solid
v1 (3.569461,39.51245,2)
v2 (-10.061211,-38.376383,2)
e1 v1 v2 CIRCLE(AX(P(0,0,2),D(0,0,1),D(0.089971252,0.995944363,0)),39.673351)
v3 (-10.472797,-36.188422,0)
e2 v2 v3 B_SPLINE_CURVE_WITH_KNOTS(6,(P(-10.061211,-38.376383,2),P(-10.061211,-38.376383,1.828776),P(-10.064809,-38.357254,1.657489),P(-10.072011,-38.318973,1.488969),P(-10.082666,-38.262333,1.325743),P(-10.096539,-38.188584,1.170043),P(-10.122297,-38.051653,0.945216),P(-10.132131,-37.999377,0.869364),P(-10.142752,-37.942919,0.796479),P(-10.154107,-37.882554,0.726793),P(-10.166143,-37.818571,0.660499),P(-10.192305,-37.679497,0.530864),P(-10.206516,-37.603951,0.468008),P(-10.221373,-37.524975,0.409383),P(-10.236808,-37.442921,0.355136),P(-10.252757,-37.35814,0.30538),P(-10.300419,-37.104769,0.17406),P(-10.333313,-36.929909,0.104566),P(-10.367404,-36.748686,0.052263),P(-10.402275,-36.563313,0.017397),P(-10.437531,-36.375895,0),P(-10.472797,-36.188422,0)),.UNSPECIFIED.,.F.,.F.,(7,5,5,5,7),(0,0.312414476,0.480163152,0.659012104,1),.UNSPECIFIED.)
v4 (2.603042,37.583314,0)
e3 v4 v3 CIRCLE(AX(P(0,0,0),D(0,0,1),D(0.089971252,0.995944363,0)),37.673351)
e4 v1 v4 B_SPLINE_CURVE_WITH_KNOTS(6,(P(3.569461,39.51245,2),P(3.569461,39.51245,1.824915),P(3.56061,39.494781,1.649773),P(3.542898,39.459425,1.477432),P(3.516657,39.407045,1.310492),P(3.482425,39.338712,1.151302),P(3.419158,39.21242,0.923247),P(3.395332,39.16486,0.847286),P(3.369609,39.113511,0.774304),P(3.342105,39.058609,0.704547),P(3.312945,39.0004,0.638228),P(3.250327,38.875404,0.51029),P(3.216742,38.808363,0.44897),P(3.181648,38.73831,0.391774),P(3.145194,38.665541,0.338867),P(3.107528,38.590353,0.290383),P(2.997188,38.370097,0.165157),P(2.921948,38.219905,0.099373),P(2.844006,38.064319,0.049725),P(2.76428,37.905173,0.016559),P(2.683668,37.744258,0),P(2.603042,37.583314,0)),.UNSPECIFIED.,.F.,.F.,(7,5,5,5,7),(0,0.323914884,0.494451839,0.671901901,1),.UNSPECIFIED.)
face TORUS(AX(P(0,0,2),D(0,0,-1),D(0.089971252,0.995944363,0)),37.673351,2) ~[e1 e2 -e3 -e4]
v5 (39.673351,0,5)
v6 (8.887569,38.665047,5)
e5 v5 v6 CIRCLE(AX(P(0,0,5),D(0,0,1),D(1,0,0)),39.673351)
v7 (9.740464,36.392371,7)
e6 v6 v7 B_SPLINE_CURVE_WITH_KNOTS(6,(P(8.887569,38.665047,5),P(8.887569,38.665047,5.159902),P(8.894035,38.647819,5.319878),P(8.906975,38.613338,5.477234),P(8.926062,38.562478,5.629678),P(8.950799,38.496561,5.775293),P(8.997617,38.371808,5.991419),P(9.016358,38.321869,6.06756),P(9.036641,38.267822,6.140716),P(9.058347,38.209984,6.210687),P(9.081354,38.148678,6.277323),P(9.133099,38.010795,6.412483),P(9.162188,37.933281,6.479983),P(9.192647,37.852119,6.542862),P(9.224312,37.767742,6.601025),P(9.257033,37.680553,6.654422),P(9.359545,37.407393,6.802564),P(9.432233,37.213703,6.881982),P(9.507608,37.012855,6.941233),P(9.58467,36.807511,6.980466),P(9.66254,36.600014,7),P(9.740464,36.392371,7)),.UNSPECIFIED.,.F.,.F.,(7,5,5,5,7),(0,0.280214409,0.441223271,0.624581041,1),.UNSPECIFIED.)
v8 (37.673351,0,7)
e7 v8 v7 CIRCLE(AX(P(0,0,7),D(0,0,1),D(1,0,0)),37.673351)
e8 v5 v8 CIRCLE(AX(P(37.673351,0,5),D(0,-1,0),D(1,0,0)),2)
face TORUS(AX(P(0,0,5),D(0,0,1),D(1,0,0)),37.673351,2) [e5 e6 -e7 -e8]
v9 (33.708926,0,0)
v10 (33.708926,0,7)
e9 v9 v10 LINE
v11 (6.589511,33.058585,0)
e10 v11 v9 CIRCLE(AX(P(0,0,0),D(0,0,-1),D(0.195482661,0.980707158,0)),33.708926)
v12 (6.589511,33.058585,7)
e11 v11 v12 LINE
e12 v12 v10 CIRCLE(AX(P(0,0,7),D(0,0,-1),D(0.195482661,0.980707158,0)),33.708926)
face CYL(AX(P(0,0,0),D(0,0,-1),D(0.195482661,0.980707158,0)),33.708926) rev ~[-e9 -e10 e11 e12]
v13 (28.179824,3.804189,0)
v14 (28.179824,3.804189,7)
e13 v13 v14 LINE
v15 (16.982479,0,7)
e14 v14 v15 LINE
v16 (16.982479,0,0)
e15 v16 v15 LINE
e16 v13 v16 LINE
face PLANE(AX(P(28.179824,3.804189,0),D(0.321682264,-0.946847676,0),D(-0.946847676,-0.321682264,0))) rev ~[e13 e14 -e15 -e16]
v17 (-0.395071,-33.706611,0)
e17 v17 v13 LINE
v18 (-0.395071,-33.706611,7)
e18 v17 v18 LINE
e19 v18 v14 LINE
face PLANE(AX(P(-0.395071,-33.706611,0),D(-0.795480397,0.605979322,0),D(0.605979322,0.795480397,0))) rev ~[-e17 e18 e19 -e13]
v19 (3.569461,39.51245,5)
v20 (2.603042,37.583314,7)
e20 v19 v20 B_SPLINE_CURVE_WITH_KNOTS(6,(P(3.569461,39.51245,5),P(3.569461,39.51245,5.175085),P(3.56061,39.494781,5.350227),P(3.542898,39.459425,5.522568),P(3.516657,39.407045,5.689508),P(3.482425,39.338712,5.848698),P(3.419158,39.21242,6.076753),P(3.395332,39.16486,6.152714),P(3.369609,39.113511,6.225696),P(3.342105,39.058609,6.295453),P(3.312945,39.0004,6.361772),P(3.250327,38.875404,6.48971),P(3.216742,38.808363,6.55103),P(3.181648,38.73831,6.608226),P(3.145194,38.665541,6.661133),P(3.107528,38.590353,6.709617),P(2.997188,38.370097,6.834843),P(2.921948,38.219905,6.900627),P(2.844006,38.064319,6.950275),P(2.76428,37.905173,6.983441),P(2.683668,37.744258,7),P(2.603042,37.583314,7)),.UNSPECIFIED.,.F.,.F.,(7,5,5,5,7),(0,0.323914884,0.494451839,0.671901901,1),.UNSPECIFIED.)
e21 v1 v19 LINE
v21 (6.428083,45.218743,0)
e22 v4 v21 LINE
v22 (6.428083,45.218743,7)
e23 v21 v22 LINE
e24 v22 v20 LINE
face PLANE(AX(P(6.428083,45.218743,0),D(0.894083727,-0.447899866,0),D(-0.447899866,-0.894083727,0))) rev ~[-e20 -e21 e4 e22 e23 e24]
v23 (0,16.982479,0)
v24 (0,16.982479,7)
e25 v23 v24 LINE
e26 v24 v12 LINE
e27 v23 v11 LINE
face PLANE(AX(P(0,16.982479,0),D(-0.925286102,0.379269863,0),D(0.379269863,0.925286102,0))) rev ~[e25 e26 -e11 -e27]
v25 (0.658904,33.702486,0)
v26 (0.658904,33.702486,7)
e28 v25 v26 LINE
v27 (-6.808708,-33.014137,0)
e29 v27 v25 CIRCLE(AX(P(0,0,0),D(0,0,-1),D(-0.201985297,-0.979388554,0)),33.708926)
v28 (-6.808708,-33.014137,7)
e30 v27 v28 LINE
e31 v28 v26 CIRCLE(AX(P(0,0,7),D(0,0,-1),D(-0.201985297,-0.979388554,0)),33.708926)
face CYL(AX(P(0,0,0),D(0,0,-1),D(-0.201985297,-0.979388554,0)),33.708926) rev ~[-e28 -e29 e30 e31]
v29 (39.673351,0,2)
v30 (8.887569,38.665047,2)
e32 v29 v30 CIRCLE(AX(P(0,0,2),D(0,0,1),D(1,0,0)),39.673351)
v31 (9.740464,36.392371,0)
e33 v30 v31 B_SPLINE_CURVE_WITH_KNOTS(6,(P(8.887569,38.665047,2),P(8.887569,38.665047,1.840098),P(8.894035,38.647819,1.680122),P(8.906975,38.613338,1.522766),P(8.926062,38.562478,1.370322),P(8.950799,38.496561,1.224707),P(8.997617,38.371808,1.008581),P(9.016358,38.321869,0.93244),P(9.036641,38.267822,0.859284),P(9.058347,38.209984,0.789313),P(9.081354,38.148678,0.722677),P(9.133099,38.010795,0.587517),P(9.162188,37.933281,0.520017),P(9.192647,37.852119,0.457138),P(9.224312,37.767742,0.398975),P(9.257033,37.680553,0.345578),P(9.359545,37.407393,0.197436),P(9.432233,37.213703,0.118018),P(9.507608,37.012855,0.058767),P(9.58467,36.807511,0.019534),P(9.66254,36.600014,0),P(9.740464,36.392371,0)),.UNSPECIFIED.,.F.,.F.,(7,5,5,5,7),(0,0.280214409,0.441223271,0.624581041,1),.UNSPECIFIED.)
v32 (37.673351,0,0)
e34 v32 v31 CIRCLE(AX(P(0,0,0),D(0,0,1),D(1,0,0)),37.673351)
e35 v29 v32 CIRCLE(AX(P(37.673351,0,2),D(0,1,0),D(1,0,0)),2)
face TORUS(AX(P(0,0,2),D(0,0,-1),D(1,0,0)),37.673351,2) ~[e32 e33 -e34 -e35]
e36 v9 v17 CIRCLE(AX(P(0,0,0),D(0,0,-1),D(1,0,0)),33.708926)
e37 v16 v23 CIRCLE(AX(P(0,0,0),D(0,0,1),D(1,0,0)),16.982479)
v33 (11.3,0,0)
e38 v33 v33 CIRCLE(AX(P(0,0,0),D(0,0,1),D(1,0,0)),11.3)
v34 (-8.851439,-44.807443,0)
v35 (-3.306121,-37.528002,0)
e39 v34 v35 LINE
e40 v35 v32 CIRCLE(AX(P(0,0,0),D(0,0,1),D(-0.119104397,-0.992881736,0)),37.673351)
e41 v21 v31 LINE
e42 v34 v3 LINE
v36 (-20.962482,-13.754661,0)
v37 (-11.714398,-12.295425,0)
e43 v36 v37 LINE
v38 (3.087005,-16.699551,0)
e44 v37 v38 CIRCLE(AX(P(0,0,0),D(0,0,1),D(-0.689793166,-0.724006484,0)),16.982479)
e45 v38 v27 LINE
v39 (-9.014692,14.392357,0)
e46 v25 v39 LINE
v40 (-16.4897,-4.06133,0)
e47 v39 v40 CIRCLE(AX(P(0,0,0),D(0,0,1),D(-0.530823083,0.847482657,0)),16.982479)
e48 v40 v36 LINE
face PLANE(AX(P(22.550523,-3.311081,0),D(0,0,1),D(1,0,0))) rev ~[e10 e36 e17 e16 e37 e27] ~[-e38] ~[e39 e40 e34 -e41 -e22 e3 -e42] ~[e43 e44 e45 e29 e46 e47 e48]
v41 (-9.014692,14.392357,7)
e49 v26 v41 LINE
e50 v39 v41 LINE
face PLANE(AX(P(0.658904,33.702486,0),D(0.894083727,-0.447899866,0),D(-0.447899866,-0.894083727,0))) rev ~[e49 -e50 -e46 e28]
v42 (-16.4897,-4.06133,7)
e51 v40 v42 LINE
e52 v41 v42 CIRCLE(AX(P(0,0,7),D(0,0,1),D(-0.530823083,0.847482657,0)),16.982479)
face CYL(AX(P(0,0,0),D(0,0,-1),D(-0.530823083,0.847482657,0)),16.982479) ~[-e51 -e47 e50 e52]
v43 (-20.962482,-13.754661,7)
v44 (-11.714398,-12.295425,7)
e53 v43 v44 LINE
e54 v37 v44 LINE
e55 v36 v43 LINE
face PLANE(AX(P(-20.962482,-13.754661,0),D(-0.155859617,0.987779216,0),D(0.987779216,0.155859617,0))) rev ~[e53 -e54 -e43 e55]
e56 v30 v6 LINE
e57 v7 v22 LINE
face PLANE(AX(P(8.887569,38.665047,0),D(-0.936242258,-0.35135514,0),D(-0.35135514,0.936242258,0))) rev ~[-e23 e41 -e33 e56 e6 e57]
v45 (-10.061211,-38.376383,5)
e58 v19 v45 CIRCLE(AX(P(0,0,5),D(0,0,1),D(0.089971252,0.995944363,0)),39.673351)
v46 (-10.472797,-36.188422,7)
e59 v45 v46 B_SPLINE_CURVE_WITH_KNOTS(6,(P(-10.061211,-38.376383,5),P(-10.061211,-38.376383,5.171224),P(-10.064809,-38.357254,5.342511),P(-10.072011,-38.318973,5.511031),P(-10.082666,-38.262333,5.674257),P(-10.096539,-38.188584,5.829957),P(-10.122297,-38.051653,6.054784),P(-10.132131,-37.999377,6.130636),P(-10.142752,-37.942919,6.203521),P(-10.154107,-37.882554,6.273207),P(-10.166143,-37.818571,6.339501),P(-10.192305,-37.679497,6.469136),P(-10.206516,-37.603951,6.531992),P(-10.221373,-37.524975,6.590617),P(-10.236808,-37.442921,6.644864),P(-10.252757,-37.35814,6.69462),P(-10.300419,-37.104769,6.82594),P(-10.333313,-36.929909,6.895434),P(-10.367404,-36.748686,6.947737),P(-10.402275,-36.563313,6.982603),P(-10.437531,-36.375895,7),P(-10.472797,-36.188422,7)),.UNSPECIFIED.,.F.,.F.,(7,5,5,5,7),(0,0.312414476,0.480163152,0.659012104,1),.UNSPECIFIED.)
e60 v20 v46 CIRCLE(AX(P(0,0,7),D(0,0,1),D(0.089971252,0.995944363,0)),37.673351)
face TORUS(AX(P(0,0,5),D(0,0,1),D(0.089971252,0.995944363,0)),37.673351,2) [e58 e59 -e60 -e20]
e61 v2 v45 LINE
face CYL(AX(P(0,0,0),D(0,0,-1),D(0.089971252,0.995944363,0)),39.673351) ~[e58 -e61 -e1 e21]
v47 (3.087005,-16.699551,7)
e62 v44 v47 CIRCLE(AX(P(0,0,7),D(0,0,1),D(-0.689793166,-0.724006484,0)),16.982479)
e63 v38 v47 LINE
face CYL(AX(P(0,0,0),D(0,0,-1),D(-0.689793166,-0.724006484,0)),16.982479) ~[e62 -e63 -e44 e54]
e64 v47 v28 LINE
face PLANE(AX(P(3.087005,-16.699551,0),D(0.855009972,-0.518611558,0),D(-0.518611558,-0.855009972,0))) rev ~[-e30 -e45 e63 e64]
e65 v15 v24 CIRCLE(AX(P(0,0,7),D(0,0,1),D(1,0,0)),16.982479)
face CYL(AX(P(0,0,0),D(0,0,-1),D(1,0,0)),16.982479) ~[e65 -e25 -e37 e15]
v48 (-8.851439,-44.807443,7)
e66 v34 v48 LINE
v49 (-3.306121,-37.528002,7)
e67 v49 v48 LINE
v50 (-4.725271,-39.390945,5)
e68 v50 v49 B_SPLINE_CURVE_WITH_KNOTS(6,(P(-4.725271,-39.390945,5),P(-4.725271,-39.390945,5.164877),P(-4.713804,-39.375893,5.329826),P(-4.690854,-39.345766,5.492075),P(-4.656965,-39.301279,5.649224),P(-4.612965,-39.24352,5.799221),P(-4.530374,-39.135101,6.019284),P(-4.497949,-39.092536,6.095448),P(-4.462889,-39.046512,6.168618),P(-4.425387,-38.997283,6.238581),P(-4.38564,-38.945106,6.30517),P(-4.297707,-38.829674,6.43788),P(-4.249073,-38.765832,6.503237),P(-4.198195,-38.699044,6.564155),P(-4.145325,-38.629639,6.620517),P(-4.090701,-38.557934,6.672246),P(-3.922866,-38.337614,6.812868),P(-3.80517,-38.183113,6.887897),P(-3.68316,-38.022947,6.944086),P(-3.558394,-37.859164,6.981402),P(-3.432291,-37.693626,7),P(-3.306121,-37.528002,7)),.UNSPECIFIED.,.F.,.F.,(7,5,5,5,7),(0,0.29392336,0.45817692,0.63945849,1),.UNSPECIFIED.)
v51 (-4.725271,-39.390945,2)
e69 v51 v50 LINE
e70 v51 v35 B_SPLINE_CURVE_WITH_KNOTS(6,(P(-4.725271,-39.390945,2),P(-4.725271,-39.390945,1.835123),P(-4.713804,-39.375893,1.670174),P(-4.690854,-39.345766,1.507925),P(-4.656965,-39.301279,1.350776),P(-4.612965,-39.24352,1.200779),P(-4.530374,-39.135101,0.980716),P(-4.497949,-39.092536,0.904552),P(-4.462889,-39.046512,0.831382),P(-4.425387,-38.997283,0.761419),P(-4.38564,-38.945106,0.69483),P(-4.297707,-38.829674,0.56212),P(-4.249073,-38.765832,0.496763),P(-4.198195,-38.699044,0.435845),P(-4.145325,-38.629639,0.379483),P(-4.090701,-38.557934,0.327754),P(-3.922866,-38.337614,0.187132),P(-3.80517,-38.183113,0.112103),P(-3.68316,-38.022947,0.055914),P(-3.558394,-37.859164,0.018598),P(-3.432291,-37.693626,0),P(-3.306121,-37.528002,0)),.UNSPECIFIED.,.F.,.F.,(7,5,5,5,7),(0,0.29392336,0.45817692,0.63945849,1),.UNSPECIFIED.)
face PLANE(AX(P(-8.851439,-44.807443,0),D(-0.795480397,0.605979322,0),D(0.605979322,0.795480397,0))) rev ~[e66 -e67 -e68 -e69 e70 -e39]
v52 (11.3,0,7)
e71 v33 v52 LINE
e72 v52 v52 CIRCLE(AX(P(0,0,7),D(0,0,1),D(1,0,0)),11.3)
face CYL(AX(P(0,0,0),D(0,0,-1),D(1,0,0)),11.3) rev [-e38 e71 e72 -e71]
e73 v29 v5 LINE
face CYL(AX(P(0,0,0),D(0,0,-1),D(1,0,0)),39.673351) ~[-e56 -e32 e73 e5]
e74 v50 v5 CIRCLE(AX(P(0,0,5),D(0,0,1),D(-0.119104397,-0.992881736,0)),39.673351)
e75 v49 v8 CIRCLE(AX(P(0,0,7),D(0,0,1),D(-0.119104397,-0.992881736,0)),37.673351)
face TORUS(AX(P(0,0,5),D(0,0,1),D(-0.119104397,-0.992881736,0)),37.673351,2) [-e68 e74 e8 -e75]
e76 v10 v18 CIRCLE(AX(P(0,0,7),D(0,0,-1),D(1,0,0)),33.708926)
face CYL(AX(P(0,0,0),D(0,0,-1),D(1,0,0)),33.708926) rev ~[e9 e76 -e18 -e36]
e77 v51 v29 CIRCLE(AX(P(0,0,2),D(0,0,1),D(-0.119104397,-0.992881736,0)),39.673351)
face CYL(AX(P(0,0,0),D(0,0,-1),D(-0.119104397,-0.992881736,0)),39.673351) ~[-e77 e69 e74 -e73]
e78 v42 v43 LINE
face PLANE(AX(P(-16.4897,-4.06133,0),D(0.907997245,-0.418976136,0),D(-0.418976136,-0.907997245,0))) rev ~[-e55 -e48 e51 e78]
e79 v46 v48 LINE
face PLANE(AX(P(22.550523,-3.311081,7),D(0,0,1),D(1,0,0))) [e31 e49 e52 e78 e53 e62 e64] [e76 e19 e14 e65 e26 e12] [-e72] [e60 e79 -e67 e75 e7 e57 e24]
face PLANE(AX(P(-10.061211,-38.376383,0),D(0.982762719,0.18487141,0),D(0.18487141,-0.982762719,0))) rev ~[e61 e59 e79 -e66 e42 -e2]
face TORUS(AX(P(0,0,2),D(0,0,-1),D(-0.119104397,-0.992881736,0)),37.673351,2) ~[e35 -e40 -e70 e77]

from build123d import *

# Parameters (mm, degrees)
F0_R     = 11.3
F1_DEPTH = 7
F2_R     = 2


# Not quite as in the source:
# - a feature names something its author has since deleted; it is built from what else it names


with BuildPart() as f1:
    # F0 (on Top) → F1 (new body)
    with BuildSketch(Plane.XY):
        with BuildLine():
            Line((8.8875694593, 38.6650469228), (6.5895106012, 33.0585853257))
            ThreePointArc((6.5895106012, 33.0585853257), (26.0616292761, 21.3795040442), (33.7089263208, 0))
            ThreePointArc((33.7089263208, 0), (23.6957200597, -23.9750821594), (-0.3950708864, -33.7066111126))
            Line((-0.3950708864, -33.7066111126), (-4.7252705017, -39.390945192))
            ThreePointArc((-4.7252705017, -39.390945192), (26.3297116519, -29.6769443973), (39.6733505572, 0))
            ThreePointArc((39.6733505572, 0), (31.0368684244, 24.7120930485), (8.8875694593, 38.6650469228))
        make_face()
        with BuildLine():
            ThreePointArc((0.6589035842, 33.7024859583), (3.6384789483, 33.5119856864), (6.5895106012, 33.0585853257))
            Line((6.5895106012, 33.0585853257), (8.8875694593, 38.6650469228))
            ThreePointArc((8.8875694593, 38.6650469228), (6.2429099817, 39.1790865053), (3.5694610238, 39.5124498409))
            Line((3.5694610238, 39.5124498409), (0.6589035842, 33.7024859583))
        make_face()
        with BuildLine():
            Line((-10.061211071, -38.3763830528), (-6.8087075048, -33.0141366056))
            ThreePointArc((-6.8087075048, -33.0141366056), (-33.4997306504, 3.7496346558), (0.6589035842, 33.7024859583))
            Line((0.6589035842, 33.7024859583), (3.5694610238, 39.5124498409))
            ThreePointArc((3.5694610238, 39.5124498409), (-39.0794482696, 6.8389668354), (-10.061211071, -38.3763830528))
        make_face()
        with BuildLine():
            ThreePointArc((-0.3950708864, -33.7066111126), (-3.6184922292, -33.5141496638), (-6.8087075048, -33.0141366056))
            Line((-6.8087075048, -33.0141366056), (-10.061211071, -38.3763830528))
            ThreePointArc((-10.061211071, -38.3763830528), (-7.4106236855, -38.9750869277), (-4.7252705017, -39.390945192))
            Line((-4.7252705017, -39.390945192), (-0.3950708864, -33.7066111126))
        make_face()
        with BuildLine():
            ThreePointArc((3.5694610238, 39.5124498409), (6.2429099817, 39.1790865053), (8.8875694593, 38.6650469228))
            Line((8.8875694593, 38.6650469228), (6.4280834783, 45.2187427282))
            Line((6.4280834783, 45.2187427282), (3.5694610238, 39.5124498409))
        make_face()
        with BuildLine():
            ThreePointArc((-4.7252705017, -39.390945192), (-7.4106236855, -38.9750869277), (-10.061211071, -38.3763830528))
            Line((-10.061211071, -38.3763830528), (-8.8514386924, -44.8074434017))
            Line((-8.8514386924, -44.8074434017), (-4.7252705017, -39.390945192))
        make_face()
        with BuildLine():
            ThreePointArc((-9.0146919562, 14.392356585), (-4.6897069772, 16.3221091653), (0, 16.9824791811))
            Line((0, 16.9824791811), (6.5895106012, 33.0585853257))
            ThreePointArc((6.5895106012, 33.0585853257), (3.6384789483, 33.5119856864), (0.6589035842, 33.7024859583))
            Line((0.6589035842, 33.7024859583), (-9.0146919562, 14.392356585))
        make_face()
        with BuildLine():
            ThreePointArc((3.0870048037, -16.6995509065), (13.054301857, -10.8623110875), (16.9824791811, 0))
            ThreePointArc((16.9824791811, 0), (12.0084261903, 12.0084261903), (0, 16.9824791811))
            ThreePointArc((0, 16.9824791811), (-4.6897069772, 16.3221091653), (-9.0146919562, 14.392356585))
            ThreePointArc((-9.0146919562, 14.392356585), (-15.7401759471, 6.37584977), (-16.4896996402, -4.0613304363))
            ThreePointArc((-16.4896996402, -4.0613304363), (-14.690740637, -8.5197851306), (-11.7143980752, -12.2954250382))
            ThreePointArc((-11.7143980752, -12.2954250382), (-4.8432488922, -16.2772091989), (3.0870048037, -16.6995509065))
        make_face()
        Circle(F0_R, mode=Mode.SUBTRACT)
        with BuildLine():
            Line((-20.9624820809, -13.7546608704), (-11.7143980752, -12.2954250382))
            ThreePointArc((-11.7143980752, -12.2954250382), (-14.690740637, -8.5197851306), (-16.4896996402, -4.0613304363))
            Line((-16.4896996402, -4.0613304363), (-20.9624820809, -13.7546608704))
        make_face()
        with BuildLine():
            Line((28.1798244973, 3.8041888679), (16.9824791811, 0))
            ThreePointArc((16.9824791811, 0), (13.054301857, -10.8623110875), (3.0870048037, -16.6995509065))
            Line((3.0870048037, -16.6995509065), (-6.8087075048, -33.0141366056))
            ThreePointArc((-6.8087075048, -33.0141366056), (-3.6184922292, -33.5141496638), (-0.3950708864, -33.7066111126))
            Line((-0.3950708864, -33.7066111126), (28.1798244973, 3.8041888679))
        make_face()
    extrude(amount=F1_DEPTH)

    # F2
    f2_edges = [f1.edges().sort_by_distance(p)[0] for p in [
        (39.083445, -6.81609, 7),
        (39.083445, -6.81609, 0),
        (-39.079448, 6.838967, 0),
        (-39.079448, 6.838967, 7),
    ]]
    fillet(f2_edges, radius=F2_R)


solid = f1.part
